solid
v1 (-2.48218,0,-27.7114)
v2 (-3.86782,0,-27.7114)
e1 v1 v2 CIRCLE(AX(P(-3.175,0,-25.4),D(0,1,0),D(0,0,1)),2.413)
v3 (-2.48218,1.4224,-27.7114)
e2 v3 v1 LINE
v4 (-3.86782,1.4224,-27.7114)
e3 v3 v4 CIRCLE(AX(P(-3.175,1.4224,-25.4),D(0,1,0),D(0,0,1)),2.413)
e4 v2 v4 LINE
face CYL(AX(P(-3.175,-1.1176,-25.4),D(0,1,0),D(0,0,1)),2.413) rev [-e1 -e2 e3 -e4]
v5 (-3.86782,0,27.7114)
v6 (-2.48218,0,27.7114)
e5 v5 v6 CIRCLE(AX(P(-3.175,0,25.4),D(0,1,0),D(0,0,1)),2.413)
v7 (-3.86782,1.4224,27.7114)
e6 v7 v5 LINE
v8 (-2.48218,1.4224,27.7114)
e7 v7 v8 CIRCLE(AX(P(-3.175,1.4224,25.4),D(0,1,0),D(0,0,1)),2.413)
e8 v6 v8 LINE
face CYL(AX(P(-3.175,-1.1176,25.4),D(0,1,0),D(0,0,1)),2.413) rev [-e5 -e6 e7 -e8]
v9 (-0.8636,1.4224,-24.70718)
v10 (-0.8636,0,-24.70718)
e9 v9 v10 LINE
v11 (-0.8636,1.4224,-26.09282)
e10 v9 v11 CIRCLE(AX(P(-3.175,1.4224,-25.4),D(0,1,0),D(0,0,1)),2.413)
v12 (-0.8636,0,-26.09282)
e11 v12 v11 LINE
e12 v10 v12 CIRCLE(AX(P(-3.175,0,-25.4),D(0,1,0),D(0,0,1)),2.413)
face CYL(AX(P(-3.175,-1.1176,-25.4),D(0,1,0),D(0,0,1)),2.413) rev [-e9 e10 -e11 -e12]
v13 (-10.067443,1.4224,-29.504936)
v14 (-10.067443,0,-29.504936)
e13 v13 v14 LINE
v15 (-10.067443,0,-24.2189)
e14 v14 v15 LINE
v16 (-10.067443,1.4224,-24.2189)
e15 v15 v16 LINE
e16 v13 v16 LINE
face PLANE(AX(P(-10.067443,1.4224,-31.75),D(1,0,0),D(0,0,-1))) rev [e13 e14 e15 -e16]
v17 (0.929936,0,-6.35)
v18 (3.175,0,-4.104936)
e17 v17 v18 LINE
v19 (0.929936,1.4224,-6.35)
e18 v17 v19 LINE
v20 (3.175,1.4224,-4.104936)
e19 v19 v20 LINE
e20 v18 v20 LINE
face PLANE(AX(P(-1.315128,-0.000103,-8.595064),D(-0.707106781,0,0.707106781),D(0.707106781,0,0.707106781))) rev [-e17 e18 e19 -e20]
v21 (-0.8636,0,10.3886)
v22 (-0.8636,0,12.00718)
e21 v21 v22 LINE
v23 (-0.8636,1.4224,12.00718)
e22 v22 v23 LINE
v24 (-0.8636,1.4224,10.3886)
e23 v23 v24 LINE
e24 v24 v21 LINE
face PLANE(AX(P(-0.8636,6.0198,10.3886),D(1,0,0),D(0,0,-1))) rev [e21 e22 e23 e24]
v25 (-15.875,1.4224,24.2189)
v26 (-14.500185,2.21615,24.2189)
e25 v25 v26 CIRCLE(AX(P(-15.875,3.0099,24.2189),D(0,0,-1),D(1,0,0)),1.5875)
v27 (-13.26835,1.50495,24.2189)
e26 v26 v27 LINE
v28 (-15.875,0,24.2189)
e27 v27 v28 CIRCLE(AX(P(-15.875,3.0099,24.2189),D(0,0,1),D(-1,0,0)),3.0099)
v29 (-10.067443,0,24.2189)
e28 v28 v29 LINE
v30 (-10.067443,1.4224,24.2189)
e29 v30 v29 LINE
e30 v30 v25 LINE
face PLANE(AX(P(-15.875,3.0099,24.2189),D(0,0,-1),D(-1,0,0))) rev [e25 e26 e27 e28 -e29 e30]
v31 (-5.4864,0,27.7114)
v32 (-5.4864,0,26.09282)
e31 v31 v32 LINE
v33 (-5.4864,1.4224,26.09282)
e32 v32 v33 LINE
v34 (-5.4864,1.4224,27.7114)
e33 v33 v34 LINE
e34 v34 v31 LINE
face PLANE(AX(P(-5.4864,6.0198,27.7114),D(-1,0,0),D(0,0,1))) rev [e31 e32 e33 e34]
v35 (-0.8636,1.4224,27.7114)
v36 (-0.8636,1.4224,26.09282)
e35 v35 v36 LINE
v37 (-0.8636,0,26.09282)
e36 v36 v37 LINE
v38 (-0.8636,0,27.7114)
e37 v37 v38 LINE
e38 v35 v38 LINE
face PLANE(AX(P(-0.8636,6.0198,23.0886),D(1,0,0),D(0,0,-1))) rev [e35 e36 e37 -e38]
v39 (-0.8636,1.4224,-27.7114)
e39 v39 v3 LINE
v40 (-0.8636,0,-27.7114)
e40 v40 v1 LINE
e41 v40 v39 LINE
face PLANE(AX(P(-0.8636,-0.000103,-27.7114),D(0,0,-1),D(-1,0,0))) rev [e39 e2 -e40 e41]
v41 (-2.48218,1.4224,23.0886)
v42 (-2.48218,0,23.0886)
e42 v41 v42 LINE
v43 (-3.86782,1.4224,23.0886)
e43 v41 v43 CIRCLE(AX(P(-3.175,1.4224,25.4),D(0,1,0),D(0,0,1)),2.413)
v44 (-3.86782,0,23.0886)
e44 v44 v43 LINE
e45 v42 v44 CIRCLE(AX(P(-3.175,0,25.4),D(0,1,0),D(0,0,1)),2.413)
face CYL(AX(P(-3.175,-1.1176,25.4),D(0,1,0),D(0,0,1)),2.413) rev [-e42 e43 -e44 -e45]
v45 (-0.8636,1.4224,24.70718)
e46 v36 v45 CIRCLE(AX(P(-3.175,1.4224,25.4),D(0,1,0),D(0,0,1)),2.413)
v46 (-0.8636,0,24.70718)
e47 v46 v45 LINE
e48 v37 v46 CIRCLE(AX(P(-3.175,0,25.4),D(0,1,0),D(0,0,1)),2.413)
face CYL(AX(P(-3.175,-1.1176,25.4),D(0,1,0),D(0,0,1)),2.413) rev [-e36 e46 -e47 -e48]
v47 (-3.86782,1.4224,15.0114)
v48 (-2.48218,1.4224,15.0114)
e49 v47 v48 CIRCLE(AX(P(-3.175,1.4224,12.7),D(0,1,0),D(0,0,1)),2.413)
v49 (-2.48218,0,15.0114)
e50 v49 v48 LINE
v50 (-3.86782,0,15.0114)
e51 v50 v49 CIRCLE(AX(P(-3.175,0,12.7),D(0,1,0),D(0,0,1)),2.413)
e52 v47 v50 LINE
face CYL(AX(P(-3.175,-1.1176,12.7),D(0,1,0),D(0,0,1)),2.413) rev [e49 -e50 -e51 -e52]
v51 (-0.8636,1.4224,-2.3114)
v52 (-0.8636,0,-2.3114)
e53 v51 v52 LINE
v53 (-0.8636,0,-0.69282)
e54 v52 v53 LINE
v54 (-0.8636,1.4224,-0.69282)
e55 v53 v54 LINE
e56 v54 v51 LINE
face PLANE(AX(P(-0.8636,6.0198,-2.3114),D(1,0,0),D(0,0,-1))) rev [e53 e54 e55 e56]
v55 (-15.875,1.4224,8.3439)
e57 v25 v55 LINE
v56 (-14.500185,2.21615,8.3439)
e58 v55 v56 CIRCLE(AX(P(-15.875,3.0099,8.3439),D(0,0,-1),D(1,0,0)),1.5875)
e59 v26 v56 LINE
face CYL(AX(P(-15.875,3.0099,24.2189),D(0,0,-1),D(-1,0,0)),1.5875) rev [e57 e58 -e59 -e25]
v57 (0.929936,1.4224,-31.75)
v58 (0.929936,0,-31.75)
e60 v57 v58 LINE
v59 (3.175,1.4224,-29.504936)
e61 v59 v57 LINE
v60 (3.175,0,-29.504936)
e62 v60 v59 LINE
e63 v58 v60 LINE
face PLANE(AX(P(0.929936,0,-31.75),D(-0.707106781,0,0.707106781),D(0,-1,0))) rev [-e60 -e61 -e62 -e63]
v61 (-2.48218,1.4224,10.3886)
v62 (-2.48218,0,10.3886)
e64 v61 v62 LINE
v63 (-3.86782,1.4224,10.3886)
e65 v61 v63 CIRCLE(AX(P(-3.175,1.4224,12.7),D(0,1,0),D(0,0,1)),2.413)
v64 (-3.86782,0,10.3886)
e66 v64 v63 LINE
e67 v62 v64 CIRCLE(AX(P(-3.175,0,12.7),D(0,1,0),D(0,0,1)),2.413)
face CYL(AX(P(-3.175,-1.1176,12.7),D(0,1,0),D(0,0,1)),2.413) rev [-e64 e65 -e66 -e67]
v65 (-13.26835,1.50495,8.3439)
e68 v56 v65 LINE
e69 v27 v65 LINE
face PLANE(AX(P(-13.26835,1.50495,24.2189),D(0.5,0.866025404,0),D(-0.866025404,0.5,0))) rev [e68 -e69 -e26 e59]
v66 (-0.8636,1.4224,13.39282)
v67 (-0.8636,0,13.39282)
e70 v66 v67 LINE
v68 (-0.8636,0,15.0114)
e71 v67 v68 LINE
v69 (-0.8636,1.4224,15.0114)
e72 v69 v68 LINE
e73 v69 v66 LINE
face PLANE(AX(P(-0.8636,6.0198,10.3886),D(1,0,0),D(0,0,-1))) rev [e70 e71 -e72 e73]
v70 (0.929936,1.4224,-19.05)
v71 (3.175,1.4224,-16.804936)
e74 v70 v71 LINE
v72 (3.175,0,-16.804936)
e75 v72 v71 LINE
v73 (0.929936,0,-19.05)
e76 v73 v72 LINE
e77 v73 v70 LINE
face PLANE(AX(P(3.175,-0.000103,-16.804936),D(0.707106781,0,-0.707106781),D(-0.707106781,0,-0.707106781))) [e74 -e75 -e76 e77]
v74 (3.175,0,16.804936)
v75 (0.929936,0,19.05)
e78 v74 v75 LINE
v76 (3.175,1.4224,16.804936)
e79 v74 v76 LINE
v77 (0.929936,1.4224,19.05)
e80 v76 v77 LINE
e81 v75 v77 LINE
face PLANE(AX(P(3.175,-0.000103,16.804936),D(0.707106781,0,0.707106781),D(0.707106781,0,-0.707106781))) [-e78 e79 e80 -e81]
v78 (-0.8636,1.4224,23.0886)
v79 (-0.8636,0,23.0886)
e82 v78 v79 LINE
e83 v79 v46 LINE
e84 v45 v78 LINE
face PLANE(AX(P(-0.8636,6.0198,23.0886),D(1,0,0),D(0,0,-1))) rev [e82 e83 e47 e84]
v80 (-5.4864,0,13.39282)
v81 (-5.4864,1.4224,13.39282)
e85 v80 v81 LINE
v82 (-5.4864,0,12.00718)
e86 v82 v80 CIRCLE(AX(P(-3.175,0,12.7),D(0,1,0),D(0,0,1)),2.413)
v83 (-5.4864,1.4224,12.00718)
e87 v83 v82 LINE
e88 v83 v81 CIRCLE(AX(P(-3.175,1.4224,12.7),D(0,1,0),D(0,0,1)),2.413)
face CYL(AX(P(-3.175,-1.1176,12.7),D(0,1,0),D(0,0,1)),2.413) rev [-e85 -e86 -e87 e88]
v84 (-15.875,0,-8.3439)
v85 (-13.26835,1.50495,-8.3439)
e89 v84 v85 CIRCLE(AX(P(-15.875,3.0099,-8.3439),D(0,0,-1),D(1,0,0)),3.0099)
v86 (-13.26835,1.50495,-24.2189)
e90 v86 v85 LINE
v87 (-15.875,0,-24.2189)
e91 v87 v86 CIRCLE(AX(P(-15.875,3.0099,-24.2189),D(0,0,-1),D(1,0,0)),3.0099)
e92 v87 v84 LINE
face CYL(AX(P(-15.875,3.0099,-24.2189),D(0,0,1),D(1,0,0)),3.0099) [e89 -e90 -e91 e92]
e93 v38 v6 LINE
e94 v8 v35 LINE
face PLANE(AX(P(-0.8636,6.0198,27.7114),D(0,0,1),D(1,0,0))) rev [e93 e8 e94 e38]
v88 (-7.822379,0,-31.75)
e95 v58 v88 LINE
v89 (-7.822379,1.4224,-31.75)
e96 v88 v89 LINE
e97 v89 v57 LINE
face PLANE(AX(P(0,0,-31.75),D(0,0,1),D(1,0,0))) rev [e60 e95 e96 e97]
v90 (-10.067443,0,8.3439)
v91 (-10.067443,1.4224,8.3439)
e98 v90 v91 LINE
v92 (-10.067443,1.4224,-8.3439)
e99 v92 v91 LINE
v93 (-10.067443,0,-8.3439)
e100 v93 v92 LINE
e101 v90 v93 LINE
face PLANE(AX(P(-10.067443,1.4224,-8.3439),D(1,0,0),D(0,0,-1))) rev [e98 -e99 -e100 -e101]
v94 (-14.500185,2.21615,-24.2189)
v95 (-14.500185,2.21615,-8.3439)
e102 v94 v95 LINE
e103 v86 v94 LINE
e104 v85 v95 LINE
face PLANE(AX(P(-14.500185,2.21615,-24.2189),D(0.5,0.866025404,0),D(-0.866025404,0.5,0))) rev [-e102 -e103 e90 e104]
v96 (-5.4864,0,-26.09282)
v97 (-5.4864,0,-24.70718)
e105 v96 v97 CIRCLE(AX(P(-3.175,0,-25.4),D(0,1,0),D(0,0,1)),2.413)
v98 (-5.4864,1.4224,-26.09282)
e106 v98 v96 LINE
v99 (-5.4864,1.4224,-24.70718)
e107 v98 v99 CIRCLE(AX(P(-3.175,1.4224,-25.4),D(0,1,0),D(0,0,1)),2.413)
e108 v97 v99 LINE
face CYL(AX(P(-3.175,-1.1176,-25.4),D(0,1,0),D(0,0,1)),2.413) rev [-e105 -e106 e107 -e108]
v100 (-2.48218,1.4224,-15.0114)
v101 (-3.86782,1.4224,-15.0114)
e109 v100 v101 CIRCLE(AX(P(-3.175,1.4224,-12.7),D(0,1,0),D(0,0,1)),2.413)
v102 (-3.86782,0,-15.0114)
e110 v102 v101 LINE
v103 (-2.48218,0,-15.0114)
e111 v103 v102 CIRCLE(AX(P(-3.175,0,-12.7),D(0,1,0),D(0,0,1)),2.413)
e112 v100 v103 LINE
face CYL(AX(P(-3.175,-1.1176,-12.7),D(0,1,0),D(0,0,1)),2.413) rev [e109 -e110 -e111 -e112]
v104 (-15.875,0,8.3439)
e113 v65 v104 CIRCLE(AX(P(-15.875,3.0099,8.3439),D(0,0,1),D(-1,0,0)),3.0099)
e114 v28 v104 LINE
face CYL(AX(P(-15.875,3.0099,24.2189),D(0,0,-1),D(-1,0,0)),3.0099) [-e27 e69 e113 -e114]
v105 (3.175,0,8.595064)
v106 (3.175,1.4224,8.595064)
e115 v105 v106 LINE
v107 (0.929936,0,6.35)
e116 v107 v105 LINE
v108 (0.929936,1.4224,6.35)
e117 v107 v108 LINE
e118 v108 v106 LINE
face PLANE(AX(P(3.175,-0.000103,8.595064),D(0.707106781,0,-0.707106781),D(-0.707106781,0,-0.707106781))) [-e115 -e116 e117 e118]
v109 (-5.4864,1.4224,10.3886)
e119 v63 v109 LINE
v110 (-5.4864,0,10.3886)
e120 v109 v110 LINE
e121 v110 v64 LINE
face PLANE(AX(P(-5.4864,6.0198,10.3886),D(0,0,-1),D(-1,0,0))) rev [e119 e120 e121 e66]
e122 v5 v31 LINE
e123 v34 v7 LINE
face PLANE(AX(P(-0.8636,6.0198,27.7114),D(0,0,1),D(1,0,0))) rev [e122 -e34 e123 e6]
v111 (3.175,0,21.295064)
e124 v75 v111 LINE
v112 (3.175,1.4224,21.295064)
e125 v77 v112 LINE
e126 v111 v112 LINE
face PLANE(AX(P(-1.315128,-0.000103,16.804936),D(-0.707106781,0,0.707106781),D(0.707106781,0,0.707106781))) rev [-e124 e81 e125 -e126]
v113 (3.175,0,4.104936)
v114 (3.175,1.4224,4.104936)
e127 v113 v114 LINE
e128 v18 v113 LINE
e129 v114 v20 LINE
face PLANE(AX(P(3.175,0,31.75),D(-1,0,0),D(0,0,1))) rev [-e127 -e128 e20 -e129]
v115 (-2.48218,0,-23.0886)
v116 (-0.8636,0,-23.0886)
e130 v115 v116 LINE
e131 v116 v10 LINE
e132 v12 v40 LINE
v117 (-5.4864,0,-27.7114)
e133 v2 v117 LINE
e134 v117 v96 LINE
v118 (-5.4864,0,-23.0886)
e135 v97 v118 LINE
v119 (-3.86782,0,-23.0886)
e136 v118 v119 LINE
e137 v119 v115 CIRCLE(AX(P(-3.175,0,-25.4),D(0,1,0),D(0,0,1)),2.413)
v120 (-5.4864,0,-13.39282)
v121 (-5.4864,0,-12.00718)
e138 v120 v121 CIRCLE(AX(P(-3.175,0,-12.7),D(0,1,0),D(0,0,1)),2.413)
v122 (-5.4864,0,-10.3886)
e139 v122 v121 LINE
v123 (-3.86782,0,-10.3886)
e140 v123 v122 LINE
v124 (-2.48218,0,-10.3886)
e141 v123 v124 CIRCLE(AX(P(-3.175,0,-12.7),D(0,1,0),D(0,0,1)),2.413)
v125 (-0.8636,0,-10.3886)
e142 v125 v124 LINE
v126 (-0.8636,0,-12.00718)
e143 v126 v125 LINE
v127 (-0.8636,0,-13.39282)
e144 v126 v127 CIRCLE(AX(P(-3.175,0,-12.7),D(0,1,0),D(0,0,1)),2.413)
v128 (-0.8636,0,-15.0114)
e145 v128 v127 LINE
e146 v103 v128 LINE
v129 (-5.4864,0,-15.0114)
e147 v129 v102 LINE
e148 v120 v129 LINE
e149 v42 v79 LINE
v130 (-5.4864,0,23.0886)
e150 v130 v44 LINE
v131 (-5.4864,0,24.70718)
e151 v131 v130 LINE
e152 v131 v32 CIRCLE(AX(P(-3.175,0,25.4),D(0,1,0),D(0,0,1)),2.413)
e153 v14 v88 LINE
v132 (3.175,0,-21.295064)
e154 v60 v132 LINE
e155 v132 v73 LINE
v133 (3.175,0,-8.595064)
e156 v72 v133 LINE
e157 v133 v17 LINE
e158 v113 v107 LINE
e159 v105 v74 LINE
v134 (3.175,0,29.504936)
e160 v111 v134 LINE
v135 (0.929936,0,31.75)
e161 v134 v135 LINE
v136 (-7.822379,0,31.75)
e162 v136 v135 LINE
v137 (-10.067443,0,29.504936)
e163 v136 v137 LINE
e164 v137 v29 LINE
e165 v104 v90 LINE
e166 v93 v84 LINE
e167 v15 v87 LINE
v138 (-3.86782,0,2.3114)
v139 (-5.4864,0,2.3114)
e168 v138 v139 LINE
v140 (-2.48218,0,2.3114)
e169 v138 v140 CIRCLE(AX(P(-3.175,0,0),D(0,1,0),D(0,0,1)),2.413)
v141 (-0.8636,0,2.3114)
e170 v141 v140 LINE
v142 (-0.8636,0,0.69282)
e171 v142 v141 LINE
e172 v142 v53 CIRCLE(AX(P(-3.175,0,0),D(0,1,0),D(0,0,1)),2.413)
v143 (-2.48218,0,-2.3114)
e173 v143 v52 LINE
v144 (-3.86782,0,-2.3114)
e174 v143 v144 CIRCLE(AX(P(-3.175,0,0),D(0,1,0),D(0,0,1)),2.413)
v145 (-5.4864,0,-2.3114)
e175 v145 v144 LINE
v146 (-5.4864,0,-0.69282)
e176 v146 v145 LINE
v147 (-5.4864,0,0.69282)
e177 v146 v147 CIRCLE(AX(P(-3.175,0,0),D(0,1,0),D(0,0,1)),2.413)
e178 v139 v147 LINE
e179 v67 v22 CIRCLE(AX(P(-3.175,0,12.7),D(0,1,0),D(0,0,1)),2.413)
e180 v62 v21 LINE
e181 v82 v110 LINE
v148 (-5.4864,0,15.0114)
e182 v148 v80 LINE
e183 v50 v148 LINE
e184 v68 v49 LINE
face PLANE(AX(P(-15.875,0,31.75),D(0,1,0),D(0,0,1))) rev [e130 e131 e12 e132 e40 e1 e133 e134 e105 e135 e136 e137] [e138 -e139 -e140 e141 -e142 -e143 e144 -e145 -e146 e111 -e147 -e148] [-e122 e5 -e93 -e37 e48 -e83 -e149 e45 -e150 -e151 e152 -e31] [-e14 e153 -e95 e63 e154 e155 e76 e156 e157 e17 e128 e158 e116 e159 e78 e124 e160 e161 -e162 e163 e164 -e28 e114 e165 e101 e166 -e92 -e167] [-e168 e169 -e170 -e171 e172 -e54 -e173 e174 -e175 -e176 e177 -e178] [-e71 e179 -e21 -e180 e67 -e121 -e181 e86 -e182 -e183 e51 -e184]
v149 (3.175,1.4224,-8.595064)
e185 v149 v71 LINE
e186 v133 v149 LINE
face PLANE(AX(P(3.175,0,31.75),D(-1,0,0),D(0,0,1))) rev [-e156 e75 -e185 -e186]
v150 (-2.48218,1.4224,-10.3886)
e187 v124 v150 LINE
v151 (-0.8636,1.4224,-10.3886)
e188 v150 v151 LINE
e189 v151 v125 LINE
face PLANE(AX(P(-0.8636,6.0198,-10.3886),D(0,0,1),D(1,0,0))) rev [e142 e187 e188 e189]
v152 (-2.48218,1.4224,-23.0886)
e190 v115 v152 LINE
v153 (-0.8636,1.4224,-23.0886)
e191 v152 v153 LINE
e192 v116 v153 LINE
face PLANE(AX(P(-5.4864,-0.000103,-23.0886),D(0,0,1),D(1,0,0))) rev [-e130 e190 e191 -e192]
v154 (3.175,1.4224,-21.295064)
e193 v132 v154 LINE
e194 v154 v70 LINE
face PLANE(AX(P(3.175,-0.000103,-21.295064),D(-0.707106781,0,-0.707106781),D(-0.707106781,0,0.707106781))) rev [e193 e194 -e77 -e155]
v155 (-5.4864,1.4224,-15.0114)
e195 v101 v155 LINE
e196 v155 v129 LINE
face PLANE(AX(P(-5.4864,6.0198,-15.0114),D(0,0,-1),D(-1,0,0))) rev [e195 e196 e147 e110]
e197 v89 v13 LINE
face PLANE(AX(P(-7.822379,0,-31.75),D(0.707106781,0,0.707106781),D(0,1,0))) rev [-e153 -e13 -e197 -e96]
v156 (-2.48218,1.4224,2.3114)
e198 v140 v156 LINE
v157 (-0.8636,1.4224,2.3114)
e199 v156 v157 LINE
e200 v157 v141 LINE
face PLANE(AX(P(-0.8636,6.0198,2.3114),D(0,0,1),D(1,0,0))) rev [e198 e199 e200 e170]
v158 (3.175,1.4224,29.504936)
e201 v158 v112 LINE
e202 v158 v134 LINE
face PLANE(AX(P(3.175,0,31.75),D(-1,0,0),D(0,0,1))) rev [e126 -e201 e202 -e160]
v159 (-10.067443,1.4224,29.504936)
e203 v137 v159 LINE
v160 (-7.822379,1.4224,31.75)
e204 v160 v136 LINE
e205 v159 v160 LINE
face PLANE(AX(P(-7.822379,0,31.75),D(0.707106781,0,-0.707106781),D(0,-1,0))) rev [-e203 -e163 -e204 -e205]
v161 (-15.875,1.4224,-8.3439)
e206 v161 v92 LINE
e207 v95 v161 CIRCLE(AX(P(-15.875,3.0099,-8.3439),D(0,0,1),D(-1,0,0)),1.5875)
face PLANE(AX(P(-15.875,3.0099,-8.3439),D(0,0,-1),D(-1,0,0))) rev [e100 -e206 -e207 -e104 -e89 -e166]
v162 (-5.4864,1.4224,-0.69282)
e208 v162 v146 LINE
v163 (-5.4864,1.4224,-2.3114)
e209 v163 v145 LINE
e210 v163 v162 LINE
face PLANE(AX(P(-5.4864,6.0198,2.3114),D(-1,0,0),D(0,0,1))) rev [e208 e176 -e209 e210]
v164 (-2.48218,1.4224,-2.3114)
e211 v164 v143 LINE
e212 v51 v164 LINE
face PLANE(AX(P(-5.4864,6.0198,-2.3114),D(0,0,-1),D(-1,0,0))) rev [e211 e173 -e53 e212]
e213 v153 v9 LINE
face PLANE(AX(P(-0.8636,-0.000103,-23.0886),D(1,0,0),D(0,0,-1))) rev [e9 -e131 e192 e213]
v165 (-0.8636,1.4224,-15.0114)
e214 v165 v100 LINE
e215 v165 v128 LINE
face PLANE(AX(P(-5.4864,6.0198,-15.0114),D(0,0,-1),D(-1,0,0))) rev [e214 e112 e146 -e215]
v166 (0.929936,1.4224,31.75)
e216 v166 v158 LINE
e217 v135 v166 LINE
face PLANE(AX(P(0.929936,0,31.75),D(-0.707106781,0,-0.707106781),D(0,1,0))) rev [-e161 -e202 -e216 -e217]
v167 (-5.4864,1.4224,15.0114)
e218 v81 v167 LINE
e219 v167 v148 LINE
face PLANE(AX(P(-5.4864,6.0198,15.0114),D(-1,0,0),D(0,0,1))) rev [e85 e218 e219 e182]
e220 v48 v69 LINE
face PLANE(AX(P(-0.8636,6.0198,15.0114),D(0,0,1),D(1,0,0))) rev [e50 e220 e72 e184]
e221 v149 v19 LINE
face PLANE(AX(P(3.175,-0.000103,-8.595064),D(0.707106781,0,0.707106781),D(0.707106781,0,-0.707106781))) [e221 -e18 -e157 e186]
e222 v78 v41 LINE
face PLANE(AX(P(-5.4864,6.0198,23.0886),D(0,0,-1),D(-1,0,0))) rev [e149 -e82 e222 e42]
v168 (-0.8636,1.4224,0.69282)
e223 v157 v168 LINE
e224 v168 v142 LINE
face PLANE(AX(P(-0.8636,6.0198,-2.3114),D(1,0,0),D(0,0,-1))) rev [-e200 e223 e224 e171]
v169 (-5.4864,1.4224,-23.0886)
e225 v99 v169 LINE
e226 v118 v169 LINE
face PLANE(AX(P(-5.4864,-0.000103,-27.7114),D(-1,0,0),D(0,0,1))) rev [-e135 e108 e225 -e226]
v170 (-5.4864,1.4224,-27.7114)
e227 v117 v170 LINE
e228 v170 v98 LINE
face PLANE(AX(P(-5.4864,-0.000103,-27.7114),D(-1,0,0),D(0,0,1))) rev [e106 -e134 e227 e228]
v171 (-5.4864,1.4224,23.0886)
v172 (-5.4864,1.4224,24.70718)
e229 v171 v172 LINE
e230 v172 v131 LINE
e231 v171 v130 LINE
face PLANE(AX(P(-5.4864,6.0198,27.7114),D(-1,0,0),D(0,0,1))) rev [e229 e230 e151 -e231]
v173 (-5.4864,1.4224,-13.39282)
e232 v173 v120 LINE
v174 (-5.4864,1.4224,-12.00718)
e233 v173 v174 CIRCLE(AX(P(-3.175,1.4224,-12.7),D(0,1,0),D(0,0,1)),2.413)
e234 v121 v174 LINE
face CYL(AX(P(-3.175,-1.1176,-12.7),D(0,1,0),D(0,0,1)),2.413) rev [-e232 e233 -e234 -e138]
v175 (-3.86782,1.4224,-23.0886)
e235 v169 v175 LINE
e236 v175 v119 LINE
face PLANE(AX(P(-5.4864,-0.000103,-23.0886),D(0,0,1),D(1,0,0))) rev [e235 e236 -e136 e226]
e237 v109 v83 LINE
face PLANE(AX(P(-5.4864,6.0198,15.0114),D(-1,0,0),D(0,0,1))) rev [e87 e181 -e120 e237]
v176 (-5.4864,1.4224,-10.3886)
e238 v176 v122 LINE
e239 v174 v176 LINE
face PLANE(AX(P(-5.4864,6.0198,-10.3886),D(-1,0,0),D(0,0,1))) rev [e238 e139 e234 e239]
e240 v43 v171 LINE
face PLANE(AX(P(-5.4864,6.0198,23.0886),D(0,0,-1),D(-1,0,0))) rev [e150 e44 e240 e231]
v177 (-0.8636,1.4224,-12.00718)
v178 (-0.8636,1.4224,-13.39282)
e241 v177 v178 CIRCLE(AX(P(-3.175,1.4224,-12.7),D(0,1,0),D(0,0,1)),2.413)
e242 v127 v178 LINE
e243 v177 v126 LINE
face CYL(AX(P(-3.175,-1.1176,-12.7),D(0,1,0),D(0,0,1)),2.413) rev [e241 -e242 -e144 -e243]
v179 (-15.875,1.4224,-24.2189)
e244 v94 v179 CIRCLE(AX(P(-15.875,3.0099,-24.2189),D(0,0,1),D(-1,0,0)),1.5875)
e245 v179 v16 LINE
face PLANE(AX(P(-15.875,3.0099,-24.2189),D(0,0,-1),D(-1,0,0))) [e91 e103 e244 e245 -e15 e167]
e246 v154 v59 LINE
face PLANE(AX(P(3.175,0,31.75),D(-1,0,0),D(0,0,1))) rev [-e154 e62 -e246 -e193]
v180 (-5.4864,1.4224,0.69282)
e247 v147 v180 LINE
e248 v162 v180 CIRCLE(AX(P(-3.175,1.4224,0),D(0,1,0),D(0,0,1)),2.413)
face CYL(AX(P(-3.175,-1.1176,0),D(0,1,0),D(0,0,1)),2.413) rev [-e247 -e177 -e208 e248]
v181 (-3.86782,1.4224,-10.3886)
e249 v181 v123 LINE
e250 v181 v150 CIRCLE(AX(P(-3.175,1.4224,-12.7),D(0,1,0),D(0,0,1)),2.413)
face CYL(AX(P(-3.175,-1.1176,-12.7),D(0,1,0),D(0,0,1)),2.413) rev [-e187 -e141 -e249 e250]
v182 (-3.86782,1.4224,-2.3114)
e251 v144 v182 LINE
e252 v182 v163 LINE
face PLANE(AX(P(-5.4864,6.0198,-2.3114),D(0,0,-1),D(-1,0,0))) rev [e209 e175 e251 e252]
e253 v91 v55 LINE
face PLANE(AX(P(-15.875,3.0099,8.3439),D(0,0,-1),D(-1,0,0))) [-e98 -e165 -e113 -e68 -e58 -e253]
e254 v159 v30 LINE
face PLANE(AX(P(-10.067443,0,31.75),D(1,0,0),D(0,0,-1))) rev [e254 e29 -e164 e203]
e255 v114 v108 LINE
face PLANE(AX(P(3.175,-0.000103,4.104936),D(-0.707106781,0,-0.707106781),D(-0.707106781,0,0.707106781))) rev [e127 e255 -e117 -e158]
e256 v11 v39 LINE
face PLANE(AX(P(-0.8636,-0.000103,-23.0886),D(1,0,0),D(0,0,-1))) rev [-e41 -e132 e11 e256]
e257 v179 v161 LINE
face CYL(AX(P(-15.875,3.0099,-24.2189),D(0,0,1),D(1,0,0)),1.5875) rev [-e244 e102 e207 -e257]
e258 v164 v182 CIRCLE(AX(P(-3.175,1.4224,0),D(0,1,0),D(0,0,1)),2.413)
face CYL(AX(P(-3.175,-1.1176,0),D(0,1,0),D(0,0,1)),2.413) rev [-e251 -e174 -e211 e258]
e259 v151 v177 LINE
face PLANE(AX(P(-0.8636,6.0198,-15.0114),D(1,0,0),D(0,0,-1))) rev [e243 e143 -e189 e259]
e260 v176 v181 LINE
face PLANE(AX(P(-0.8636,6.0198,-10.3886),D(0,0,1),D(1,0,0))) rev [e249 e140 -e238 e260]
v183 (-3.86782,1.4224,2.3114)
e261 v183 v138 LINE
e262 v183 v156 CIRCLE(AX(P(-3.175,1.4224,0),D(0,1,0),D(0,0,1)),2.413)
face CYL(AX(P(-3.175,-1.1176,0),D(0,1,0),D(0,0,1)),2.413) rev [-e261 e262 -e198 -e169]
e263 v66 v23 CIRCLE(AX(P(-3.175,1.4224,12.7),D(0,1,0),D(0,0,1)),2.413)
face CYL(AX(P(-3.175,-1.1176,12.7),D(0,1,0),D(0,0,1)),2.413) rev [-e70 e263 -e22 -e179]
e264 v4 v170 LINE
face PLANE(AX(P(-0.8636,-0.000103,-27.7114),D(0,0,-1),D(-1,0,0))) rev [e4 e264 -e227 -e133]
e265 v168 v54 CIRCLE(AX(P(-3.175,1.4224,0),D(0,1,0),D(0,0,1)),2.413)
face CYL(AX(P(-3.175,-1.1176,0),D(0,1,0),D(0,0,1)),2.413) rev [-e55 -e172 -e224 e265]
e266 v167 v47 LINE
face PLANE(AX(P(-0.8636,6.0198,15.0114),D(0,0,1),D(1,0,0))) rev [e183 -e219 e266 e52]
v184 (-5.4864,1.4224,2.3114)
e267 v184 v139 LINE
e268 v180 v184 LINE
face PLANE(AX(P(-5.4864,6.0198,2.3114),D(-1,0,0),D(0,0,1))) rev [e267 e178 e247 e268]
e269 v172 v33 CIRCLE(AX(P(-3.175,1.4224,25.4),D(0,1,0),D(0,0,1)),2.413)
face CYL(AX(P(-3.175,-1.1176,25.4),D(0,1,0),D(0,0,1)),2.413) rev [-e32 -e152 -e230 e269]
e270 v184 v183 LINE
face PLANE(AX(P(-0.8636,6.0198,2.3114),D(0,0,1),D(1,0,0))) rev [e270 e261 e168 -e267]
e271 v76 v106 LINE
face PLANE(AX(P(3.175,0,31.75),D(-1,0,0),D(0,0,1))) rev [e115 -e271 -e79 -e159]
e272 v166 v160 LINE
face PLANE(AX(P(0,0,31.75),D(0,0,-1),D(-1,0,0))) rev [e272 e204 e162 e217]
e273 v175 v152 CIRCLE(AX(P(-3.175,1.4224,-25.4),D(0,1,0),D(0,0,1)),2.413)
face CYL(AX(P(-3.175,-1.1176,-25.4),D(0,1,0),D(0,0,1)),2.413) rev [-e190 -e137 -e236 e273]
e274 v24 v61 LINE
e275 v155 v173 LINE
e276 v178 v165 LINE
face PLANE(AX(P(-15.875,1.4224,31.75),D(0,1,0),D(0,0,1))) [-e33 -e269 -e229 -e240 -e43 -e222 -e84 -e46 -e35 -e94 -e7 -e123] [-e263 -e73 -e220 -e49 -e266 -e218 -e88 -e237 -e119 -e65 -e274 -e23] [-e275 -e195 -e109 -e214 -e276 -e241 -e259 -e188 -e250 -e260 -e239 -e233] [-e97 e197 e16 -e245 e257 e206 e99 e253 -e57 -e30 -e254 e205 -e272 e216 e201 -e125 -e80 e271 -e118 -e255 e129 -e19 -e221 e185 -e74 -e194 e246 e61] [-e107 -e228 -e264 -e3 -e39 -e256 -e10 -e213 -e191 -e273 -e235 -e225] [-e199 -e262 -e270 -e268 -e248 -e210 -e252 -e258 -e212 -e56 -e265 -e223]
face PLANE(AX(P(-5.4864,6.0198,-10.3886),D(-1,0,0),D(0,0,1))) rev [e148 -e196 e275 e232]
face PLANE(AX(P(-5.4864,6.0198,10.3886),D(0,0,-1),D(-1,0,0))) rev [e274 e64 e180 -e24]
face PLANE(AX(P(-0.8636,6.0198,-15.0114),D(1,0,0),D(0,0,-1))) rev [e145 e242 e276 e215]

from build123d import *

# Parameters (mm, degrees)
BOSS_EXTRUDE1_DEPTH       = 15.875
BOSS_EXTRUDE1_START       = -16.6878
BOSS_EXTRUDE1_2_OUTLINE_W = 13.242442679
BOSS_EXTRUDE1_2_OUTLINE_H = 1.4224
BOSS_EXTRUDE1_2_DEPTH     = 16.6878
BOSS_EXTRUDE2_START       = 15.875
BOSS_EXTRUDE2_DEPTH       = 15.875
SKETCH3_W                 = 13.242442679
SKETCH3_H                 = 1.4224
BOSS_EXTRUDE3_DEPTH       = 7.5311
SKETCH4_W                 = 13.242442679
SKETCH4_H                 = 1.4224
BOSS_EXTRUDE4_DEPTH       = 7.5311
CUT_EXTRUDE1_DEPTH        = 38.226845626
CUT_EXTRUDE2_DEPTH        = 38.226845626
CUT_EXTRUDE3_DEPTH        = 38.226845626
CUT_EXTRUDE4_DEPTH        = 38.226845626
SKETCH9_W                 = 4.6228
SKETCH9_H                 = 4.6228
CUT_EXTRUDE5_DEPTH        = 38.429132244
SKETCH10_W                = 4.6228
SKETCH10_H                = 4.6228
CUT_EXTRUDE6_DEPTH        = 38.429132244
SKETCH11_W                = 4.6228
SKETCH11_H                = 4.6228
CUT_EXTRUDE7_DEPTH        = 38.429132244
SKETCH12_W                = 4.6228
SKETCH12_H                = 4.6228
CUT_EXTRUDE8_DEPTH        = 38.429132244
SKETCH13_W                = 4.6228
SKETCH13_H                = 4.6228
CUT_EXTRUDE9_DEPTH        = 38.226845626
DRAFT1_ANGLE              = 45
DRAFT2_ANGLE              = 45
CHAMFER1_SIZE             = 2.24506403
SKETCH14_R                = 2.413
CUT_EXTRUDE10_DEPTH       = 2.54
LPATTERN1_COUNT           = 5
LPATTERN1_PITCH           = 12.7


with BuildPart() as part:
    # Boss-Extrude1: read off the stored shape, not the designer's step
    # Boss-Extrude1 outline → Boss-Extrude1 (new body)
    with BuildSketch(Plane(origin=(0, 0, -8.3439), x_dir=(-1, 0, 0), z_dir=(0, 0, -1))):
        with BuildLine():
            ThreePointArc((15.875, 0), (17.379950004, 5.616549878), (13.26835013, 1.504950004))
            Line((13.26835013, 1.504950004), (14.500184664, 2.216150004))
            ThreePointArc((14.500184664, 2.216150004), (16.668750004, 4.384715344), (15.875, 1.4224))
            Line((15.875, 1.4224), (-3.175, 1.4224))
            Line((-3.175, 1.4224), (-3.175, 0))
            Line((-3.175, 0), (15.875, 0))
        make_face()
    extrude(amount=BOSS_EXTRUDE1_DEPTH)

    # Boss-Extrude1 2 outline → Boss-Extrude1 2 (add)
    with BuildSketch(Plane(origin=(0, 0, -8.3439), x_dir=(-1, 0, 0), z_dir=(0, 0, -1)).offset(BOSS_EXTRUDE1_START)):
        with Locations((3.44622134, 0.7112)):
            Rectangle(BOSS_EXTRUDE1_2_OUTLINE_W, BOSS_EXTRUDE1_2_OUTLINE_H)
    extrude(amount=BOSS_EXTRUDE1_2_DEPTH)

    # Sketch2 → Boss-Extrude2 (add)
    with BuildSketch(Plane.XY.offset(8.3439).offset(BOSS_EXTRUDE2_START)):
        with BuildLine():
            Line((3.175, -6e-09), (-15.875, -6e-09))
            ThreePointArc((-15.875, -6e-09), (-17.379950004, 5.616549873), (-13.26835013, 1.504949999))
            Line((-13.26835013, 1.504949999), (-14.500184664, 2.216149999))
            ThreePointArc((-14.500184664, 2.216149999), (-16.668750004, 4.384715339), (-15.875, 1.422399994))
            Line((-15.875, 1.422399994), (3.175, 1.422399994))
            Line((3.175, 1.422399994), (3.175, -6e-09))
        make_face()
    extrude(amount=-BOSS_EXTRUDE2_DEPTH)

    # Sketch3 → Boss-Extrude3 (add)
    with BuildSketch(Plane(origin=(0, 0, -24.2189), x_dir=(-1, 0, 0), z_dir=(0, 0, -1))):
        with Locations((3.44622134, 0.7112)):
            Rectangle(SKETCH3_W, SKETCH3_H)
    extrude(amount=BOSS_EXTRUDE3_DEPTH)

    # Sketch4 → Boss-Extrude4 (add)
    with BuildSketch(Plane.XY.offset(24.2189)):
        with Locations((-3.44622134, 0.7112)):
            Rectangle(SKETCH4_W, SKETCH4_H)
    extrude(amount=BOSS_EXTRUDE4_DEPTH)

    # Sketch5 → Cut-Extrude1 (cut, through all)
    with BuildSketch(Plane(origin=(0, 1.4224, 0), x_dir=(-1, 0, 0), z_dir=(0, 1, 0))):
        Polygon((-3.175, -16.80493597), (-3.175, -21.29506403), (1.315128061, -16.80493597), align=None)
    extrude(amount=-CUT_EXTRUDE1_DEPTH, mode=Mode.SUBTRACT)

    # Sketch6 → Cut-Extrude2 (cut, through all)
    with BuildSketch(Plane(origin=(0, 1.4224, 0), x_dir=(-1, 0, 0), z_dir=(0, 1, 0))):
        Polygon((-3.175, -4.10493597), (-3.175, -8.59506403), (1.315128061, -8.59506403), align=None)
    extrude(amount=-CUT_EXTRUDE2_DEPTH, mode=Mode.SUBTRACT)

    # Sketch7 → Cut-Extrude3 (cut, through all)
    with BuildSketch(Plane(origin=(0, 1.4224, 0), x_dir=(-1, 0, 0), z_dir=(0, 1, 0))):
        Polygon((-3.175, 8.59506403), (-3.175, 4.10493597), (1.315128061, 8.59506403), align=None)
    extrude(amount=-CUT_EXTRUDE3_DEPTH, mode=Mode.SUBTRACT)

    # Sketch8 → Cut-Extrude4 (cut, through all)
    with BuildSketch(Plane(origin=(0, 1.4224, 0), x_dir=(-1, 0, 0), z_dir=(0, 1, 0))):
        Polygon((-3.175, 21.29506403), (-3.175, 16.80493597), (1.315128061, 16.80493597), align=None)
    extrude(amount=-CUT_EXTRUDE4_DEPTH, mode=Mode.SUBTRACT)

    # Sketch9 → Cut-Extrude5 (cut, through all)
    with BuildSketch(Plane.XZ):
        with Locations((-3.175, 25.4)):
            Rectangle(SKETCH9_W, SKETCH9_H)
    extrude(amount=-CUT_EXTRUDE5_DEPTH, mode=Mode.SUBTRACT)

    # Sketch10 → Cut-Extrude6 (cut, through all)
    with BuildSketch(Plane.XZ):
        with Locations((-3.175, 12.7)):
            Rectangle(SKETCH10_W, SKETCH10_H)
    extrude(amount=-CUT_EXTRUDE6_DEPTH, mode=Mode.SUBTRACT)

    # Sketch11 → Cut-Extrude7 (cut, through all)
    with BuildSketch(Plane.XZ):
        with Locations((-3.175, 0)):
            Rectangle(SKETCH11_W, SKETCH11_H)
    extrude(amount=-CUT_EXTRUDE7_DEPTH, mode=Mode.SUBTRACT)

    # Sketch12 → Cut-Extrude8 (cut, through all)
    with BuildSketch(Plane.XZ):
        with Locations((-3.175, -12.7)):
            Rectangle(SKETCH12_W, SKETCH12_H)
    extrude(amount=-CUT_EXTRUDE8_DEPTH, mode=Mode.SUBTRACT)

    # Sketch13 → Cut-Extrude9 (cut, through all)
    with BuildSketch(Plane(origin=(0, 1.4224, 0), x_dir=(-1, 0, 0), z_dir=(0, 1, 0))):
        with Locations((3.175, -25.4)):
            Rectangle(SKETCH13_W, SKETCH13_H)
    extrude(amount=-CUT_EXTRUDE9_DEPTH, mode=Mode.SUBTRACT)

    # Draft1
    draft1_faces = [part.faces().sort_by_distance(p)[0] for p in [
        (0.92993597, 0.7112, -8.59506403),
        (0.92993597, 0.711199999, -16.80493597),
    ]]
    draft(draft1_faces, Plane(origin=(3.175, 0, 31.75), x_dir=(0, 0, 1), z_dir=(1, 0, 0)), DRAFT1_ANGLE)

    # Draft2
    draft2_faces = [part.faces().sort_by_distance(p)[0] for p in [
        (0.92993597, 0.7112, 16.80493597),
        (0.92993597, 0.711199997, 8.59506403),
    ]]
    draft(draft2_faces, Plane(origin=(3.175, 0, 31.75), x_dir=(0, 0, 1), z_dir=(1, 0, 0)), DRAFT2_ANGLE)

    # Chamfer1
    chamfer1_edges = [part.edges().sort_by_distance(p)[0] for p in [
        (3.175, 0.7112, 31.75),
        (-10.067442679, 0.7112, 31.75),
        (3.175, 0.7112, -31.75),
        (-10.067442679, 0.7112, -31.75),
    ]]
    chamfer(chamfer1_edges, length=CHAMFER1_SIZE)

    # Sketch14 → Cut-Extrude10 (cut)
    with BuildSketch(Plane(origin=(0, 1.4224, 0), x_dir=(1, 0, 0), z_dir=(0, 1, 0))):
        with Locations((-3.175, -25.4)):
            Circle(SKETCH14_R)
    cut_extrude10 = extrude(amount=-CUT_EXTRUDE10_DEPTH, mode=Mode.SUBTRACT)

    # LPattern1: Cut-Extrude10 ×5
    with Locations(*[(0, 0, -i * LPATTERN1_PITCH) for i in range(1, LPATTERN1_COUNT)]):
        add(cut_extrude10, mode=Mode.SUBTRACT)


solid = part.part
